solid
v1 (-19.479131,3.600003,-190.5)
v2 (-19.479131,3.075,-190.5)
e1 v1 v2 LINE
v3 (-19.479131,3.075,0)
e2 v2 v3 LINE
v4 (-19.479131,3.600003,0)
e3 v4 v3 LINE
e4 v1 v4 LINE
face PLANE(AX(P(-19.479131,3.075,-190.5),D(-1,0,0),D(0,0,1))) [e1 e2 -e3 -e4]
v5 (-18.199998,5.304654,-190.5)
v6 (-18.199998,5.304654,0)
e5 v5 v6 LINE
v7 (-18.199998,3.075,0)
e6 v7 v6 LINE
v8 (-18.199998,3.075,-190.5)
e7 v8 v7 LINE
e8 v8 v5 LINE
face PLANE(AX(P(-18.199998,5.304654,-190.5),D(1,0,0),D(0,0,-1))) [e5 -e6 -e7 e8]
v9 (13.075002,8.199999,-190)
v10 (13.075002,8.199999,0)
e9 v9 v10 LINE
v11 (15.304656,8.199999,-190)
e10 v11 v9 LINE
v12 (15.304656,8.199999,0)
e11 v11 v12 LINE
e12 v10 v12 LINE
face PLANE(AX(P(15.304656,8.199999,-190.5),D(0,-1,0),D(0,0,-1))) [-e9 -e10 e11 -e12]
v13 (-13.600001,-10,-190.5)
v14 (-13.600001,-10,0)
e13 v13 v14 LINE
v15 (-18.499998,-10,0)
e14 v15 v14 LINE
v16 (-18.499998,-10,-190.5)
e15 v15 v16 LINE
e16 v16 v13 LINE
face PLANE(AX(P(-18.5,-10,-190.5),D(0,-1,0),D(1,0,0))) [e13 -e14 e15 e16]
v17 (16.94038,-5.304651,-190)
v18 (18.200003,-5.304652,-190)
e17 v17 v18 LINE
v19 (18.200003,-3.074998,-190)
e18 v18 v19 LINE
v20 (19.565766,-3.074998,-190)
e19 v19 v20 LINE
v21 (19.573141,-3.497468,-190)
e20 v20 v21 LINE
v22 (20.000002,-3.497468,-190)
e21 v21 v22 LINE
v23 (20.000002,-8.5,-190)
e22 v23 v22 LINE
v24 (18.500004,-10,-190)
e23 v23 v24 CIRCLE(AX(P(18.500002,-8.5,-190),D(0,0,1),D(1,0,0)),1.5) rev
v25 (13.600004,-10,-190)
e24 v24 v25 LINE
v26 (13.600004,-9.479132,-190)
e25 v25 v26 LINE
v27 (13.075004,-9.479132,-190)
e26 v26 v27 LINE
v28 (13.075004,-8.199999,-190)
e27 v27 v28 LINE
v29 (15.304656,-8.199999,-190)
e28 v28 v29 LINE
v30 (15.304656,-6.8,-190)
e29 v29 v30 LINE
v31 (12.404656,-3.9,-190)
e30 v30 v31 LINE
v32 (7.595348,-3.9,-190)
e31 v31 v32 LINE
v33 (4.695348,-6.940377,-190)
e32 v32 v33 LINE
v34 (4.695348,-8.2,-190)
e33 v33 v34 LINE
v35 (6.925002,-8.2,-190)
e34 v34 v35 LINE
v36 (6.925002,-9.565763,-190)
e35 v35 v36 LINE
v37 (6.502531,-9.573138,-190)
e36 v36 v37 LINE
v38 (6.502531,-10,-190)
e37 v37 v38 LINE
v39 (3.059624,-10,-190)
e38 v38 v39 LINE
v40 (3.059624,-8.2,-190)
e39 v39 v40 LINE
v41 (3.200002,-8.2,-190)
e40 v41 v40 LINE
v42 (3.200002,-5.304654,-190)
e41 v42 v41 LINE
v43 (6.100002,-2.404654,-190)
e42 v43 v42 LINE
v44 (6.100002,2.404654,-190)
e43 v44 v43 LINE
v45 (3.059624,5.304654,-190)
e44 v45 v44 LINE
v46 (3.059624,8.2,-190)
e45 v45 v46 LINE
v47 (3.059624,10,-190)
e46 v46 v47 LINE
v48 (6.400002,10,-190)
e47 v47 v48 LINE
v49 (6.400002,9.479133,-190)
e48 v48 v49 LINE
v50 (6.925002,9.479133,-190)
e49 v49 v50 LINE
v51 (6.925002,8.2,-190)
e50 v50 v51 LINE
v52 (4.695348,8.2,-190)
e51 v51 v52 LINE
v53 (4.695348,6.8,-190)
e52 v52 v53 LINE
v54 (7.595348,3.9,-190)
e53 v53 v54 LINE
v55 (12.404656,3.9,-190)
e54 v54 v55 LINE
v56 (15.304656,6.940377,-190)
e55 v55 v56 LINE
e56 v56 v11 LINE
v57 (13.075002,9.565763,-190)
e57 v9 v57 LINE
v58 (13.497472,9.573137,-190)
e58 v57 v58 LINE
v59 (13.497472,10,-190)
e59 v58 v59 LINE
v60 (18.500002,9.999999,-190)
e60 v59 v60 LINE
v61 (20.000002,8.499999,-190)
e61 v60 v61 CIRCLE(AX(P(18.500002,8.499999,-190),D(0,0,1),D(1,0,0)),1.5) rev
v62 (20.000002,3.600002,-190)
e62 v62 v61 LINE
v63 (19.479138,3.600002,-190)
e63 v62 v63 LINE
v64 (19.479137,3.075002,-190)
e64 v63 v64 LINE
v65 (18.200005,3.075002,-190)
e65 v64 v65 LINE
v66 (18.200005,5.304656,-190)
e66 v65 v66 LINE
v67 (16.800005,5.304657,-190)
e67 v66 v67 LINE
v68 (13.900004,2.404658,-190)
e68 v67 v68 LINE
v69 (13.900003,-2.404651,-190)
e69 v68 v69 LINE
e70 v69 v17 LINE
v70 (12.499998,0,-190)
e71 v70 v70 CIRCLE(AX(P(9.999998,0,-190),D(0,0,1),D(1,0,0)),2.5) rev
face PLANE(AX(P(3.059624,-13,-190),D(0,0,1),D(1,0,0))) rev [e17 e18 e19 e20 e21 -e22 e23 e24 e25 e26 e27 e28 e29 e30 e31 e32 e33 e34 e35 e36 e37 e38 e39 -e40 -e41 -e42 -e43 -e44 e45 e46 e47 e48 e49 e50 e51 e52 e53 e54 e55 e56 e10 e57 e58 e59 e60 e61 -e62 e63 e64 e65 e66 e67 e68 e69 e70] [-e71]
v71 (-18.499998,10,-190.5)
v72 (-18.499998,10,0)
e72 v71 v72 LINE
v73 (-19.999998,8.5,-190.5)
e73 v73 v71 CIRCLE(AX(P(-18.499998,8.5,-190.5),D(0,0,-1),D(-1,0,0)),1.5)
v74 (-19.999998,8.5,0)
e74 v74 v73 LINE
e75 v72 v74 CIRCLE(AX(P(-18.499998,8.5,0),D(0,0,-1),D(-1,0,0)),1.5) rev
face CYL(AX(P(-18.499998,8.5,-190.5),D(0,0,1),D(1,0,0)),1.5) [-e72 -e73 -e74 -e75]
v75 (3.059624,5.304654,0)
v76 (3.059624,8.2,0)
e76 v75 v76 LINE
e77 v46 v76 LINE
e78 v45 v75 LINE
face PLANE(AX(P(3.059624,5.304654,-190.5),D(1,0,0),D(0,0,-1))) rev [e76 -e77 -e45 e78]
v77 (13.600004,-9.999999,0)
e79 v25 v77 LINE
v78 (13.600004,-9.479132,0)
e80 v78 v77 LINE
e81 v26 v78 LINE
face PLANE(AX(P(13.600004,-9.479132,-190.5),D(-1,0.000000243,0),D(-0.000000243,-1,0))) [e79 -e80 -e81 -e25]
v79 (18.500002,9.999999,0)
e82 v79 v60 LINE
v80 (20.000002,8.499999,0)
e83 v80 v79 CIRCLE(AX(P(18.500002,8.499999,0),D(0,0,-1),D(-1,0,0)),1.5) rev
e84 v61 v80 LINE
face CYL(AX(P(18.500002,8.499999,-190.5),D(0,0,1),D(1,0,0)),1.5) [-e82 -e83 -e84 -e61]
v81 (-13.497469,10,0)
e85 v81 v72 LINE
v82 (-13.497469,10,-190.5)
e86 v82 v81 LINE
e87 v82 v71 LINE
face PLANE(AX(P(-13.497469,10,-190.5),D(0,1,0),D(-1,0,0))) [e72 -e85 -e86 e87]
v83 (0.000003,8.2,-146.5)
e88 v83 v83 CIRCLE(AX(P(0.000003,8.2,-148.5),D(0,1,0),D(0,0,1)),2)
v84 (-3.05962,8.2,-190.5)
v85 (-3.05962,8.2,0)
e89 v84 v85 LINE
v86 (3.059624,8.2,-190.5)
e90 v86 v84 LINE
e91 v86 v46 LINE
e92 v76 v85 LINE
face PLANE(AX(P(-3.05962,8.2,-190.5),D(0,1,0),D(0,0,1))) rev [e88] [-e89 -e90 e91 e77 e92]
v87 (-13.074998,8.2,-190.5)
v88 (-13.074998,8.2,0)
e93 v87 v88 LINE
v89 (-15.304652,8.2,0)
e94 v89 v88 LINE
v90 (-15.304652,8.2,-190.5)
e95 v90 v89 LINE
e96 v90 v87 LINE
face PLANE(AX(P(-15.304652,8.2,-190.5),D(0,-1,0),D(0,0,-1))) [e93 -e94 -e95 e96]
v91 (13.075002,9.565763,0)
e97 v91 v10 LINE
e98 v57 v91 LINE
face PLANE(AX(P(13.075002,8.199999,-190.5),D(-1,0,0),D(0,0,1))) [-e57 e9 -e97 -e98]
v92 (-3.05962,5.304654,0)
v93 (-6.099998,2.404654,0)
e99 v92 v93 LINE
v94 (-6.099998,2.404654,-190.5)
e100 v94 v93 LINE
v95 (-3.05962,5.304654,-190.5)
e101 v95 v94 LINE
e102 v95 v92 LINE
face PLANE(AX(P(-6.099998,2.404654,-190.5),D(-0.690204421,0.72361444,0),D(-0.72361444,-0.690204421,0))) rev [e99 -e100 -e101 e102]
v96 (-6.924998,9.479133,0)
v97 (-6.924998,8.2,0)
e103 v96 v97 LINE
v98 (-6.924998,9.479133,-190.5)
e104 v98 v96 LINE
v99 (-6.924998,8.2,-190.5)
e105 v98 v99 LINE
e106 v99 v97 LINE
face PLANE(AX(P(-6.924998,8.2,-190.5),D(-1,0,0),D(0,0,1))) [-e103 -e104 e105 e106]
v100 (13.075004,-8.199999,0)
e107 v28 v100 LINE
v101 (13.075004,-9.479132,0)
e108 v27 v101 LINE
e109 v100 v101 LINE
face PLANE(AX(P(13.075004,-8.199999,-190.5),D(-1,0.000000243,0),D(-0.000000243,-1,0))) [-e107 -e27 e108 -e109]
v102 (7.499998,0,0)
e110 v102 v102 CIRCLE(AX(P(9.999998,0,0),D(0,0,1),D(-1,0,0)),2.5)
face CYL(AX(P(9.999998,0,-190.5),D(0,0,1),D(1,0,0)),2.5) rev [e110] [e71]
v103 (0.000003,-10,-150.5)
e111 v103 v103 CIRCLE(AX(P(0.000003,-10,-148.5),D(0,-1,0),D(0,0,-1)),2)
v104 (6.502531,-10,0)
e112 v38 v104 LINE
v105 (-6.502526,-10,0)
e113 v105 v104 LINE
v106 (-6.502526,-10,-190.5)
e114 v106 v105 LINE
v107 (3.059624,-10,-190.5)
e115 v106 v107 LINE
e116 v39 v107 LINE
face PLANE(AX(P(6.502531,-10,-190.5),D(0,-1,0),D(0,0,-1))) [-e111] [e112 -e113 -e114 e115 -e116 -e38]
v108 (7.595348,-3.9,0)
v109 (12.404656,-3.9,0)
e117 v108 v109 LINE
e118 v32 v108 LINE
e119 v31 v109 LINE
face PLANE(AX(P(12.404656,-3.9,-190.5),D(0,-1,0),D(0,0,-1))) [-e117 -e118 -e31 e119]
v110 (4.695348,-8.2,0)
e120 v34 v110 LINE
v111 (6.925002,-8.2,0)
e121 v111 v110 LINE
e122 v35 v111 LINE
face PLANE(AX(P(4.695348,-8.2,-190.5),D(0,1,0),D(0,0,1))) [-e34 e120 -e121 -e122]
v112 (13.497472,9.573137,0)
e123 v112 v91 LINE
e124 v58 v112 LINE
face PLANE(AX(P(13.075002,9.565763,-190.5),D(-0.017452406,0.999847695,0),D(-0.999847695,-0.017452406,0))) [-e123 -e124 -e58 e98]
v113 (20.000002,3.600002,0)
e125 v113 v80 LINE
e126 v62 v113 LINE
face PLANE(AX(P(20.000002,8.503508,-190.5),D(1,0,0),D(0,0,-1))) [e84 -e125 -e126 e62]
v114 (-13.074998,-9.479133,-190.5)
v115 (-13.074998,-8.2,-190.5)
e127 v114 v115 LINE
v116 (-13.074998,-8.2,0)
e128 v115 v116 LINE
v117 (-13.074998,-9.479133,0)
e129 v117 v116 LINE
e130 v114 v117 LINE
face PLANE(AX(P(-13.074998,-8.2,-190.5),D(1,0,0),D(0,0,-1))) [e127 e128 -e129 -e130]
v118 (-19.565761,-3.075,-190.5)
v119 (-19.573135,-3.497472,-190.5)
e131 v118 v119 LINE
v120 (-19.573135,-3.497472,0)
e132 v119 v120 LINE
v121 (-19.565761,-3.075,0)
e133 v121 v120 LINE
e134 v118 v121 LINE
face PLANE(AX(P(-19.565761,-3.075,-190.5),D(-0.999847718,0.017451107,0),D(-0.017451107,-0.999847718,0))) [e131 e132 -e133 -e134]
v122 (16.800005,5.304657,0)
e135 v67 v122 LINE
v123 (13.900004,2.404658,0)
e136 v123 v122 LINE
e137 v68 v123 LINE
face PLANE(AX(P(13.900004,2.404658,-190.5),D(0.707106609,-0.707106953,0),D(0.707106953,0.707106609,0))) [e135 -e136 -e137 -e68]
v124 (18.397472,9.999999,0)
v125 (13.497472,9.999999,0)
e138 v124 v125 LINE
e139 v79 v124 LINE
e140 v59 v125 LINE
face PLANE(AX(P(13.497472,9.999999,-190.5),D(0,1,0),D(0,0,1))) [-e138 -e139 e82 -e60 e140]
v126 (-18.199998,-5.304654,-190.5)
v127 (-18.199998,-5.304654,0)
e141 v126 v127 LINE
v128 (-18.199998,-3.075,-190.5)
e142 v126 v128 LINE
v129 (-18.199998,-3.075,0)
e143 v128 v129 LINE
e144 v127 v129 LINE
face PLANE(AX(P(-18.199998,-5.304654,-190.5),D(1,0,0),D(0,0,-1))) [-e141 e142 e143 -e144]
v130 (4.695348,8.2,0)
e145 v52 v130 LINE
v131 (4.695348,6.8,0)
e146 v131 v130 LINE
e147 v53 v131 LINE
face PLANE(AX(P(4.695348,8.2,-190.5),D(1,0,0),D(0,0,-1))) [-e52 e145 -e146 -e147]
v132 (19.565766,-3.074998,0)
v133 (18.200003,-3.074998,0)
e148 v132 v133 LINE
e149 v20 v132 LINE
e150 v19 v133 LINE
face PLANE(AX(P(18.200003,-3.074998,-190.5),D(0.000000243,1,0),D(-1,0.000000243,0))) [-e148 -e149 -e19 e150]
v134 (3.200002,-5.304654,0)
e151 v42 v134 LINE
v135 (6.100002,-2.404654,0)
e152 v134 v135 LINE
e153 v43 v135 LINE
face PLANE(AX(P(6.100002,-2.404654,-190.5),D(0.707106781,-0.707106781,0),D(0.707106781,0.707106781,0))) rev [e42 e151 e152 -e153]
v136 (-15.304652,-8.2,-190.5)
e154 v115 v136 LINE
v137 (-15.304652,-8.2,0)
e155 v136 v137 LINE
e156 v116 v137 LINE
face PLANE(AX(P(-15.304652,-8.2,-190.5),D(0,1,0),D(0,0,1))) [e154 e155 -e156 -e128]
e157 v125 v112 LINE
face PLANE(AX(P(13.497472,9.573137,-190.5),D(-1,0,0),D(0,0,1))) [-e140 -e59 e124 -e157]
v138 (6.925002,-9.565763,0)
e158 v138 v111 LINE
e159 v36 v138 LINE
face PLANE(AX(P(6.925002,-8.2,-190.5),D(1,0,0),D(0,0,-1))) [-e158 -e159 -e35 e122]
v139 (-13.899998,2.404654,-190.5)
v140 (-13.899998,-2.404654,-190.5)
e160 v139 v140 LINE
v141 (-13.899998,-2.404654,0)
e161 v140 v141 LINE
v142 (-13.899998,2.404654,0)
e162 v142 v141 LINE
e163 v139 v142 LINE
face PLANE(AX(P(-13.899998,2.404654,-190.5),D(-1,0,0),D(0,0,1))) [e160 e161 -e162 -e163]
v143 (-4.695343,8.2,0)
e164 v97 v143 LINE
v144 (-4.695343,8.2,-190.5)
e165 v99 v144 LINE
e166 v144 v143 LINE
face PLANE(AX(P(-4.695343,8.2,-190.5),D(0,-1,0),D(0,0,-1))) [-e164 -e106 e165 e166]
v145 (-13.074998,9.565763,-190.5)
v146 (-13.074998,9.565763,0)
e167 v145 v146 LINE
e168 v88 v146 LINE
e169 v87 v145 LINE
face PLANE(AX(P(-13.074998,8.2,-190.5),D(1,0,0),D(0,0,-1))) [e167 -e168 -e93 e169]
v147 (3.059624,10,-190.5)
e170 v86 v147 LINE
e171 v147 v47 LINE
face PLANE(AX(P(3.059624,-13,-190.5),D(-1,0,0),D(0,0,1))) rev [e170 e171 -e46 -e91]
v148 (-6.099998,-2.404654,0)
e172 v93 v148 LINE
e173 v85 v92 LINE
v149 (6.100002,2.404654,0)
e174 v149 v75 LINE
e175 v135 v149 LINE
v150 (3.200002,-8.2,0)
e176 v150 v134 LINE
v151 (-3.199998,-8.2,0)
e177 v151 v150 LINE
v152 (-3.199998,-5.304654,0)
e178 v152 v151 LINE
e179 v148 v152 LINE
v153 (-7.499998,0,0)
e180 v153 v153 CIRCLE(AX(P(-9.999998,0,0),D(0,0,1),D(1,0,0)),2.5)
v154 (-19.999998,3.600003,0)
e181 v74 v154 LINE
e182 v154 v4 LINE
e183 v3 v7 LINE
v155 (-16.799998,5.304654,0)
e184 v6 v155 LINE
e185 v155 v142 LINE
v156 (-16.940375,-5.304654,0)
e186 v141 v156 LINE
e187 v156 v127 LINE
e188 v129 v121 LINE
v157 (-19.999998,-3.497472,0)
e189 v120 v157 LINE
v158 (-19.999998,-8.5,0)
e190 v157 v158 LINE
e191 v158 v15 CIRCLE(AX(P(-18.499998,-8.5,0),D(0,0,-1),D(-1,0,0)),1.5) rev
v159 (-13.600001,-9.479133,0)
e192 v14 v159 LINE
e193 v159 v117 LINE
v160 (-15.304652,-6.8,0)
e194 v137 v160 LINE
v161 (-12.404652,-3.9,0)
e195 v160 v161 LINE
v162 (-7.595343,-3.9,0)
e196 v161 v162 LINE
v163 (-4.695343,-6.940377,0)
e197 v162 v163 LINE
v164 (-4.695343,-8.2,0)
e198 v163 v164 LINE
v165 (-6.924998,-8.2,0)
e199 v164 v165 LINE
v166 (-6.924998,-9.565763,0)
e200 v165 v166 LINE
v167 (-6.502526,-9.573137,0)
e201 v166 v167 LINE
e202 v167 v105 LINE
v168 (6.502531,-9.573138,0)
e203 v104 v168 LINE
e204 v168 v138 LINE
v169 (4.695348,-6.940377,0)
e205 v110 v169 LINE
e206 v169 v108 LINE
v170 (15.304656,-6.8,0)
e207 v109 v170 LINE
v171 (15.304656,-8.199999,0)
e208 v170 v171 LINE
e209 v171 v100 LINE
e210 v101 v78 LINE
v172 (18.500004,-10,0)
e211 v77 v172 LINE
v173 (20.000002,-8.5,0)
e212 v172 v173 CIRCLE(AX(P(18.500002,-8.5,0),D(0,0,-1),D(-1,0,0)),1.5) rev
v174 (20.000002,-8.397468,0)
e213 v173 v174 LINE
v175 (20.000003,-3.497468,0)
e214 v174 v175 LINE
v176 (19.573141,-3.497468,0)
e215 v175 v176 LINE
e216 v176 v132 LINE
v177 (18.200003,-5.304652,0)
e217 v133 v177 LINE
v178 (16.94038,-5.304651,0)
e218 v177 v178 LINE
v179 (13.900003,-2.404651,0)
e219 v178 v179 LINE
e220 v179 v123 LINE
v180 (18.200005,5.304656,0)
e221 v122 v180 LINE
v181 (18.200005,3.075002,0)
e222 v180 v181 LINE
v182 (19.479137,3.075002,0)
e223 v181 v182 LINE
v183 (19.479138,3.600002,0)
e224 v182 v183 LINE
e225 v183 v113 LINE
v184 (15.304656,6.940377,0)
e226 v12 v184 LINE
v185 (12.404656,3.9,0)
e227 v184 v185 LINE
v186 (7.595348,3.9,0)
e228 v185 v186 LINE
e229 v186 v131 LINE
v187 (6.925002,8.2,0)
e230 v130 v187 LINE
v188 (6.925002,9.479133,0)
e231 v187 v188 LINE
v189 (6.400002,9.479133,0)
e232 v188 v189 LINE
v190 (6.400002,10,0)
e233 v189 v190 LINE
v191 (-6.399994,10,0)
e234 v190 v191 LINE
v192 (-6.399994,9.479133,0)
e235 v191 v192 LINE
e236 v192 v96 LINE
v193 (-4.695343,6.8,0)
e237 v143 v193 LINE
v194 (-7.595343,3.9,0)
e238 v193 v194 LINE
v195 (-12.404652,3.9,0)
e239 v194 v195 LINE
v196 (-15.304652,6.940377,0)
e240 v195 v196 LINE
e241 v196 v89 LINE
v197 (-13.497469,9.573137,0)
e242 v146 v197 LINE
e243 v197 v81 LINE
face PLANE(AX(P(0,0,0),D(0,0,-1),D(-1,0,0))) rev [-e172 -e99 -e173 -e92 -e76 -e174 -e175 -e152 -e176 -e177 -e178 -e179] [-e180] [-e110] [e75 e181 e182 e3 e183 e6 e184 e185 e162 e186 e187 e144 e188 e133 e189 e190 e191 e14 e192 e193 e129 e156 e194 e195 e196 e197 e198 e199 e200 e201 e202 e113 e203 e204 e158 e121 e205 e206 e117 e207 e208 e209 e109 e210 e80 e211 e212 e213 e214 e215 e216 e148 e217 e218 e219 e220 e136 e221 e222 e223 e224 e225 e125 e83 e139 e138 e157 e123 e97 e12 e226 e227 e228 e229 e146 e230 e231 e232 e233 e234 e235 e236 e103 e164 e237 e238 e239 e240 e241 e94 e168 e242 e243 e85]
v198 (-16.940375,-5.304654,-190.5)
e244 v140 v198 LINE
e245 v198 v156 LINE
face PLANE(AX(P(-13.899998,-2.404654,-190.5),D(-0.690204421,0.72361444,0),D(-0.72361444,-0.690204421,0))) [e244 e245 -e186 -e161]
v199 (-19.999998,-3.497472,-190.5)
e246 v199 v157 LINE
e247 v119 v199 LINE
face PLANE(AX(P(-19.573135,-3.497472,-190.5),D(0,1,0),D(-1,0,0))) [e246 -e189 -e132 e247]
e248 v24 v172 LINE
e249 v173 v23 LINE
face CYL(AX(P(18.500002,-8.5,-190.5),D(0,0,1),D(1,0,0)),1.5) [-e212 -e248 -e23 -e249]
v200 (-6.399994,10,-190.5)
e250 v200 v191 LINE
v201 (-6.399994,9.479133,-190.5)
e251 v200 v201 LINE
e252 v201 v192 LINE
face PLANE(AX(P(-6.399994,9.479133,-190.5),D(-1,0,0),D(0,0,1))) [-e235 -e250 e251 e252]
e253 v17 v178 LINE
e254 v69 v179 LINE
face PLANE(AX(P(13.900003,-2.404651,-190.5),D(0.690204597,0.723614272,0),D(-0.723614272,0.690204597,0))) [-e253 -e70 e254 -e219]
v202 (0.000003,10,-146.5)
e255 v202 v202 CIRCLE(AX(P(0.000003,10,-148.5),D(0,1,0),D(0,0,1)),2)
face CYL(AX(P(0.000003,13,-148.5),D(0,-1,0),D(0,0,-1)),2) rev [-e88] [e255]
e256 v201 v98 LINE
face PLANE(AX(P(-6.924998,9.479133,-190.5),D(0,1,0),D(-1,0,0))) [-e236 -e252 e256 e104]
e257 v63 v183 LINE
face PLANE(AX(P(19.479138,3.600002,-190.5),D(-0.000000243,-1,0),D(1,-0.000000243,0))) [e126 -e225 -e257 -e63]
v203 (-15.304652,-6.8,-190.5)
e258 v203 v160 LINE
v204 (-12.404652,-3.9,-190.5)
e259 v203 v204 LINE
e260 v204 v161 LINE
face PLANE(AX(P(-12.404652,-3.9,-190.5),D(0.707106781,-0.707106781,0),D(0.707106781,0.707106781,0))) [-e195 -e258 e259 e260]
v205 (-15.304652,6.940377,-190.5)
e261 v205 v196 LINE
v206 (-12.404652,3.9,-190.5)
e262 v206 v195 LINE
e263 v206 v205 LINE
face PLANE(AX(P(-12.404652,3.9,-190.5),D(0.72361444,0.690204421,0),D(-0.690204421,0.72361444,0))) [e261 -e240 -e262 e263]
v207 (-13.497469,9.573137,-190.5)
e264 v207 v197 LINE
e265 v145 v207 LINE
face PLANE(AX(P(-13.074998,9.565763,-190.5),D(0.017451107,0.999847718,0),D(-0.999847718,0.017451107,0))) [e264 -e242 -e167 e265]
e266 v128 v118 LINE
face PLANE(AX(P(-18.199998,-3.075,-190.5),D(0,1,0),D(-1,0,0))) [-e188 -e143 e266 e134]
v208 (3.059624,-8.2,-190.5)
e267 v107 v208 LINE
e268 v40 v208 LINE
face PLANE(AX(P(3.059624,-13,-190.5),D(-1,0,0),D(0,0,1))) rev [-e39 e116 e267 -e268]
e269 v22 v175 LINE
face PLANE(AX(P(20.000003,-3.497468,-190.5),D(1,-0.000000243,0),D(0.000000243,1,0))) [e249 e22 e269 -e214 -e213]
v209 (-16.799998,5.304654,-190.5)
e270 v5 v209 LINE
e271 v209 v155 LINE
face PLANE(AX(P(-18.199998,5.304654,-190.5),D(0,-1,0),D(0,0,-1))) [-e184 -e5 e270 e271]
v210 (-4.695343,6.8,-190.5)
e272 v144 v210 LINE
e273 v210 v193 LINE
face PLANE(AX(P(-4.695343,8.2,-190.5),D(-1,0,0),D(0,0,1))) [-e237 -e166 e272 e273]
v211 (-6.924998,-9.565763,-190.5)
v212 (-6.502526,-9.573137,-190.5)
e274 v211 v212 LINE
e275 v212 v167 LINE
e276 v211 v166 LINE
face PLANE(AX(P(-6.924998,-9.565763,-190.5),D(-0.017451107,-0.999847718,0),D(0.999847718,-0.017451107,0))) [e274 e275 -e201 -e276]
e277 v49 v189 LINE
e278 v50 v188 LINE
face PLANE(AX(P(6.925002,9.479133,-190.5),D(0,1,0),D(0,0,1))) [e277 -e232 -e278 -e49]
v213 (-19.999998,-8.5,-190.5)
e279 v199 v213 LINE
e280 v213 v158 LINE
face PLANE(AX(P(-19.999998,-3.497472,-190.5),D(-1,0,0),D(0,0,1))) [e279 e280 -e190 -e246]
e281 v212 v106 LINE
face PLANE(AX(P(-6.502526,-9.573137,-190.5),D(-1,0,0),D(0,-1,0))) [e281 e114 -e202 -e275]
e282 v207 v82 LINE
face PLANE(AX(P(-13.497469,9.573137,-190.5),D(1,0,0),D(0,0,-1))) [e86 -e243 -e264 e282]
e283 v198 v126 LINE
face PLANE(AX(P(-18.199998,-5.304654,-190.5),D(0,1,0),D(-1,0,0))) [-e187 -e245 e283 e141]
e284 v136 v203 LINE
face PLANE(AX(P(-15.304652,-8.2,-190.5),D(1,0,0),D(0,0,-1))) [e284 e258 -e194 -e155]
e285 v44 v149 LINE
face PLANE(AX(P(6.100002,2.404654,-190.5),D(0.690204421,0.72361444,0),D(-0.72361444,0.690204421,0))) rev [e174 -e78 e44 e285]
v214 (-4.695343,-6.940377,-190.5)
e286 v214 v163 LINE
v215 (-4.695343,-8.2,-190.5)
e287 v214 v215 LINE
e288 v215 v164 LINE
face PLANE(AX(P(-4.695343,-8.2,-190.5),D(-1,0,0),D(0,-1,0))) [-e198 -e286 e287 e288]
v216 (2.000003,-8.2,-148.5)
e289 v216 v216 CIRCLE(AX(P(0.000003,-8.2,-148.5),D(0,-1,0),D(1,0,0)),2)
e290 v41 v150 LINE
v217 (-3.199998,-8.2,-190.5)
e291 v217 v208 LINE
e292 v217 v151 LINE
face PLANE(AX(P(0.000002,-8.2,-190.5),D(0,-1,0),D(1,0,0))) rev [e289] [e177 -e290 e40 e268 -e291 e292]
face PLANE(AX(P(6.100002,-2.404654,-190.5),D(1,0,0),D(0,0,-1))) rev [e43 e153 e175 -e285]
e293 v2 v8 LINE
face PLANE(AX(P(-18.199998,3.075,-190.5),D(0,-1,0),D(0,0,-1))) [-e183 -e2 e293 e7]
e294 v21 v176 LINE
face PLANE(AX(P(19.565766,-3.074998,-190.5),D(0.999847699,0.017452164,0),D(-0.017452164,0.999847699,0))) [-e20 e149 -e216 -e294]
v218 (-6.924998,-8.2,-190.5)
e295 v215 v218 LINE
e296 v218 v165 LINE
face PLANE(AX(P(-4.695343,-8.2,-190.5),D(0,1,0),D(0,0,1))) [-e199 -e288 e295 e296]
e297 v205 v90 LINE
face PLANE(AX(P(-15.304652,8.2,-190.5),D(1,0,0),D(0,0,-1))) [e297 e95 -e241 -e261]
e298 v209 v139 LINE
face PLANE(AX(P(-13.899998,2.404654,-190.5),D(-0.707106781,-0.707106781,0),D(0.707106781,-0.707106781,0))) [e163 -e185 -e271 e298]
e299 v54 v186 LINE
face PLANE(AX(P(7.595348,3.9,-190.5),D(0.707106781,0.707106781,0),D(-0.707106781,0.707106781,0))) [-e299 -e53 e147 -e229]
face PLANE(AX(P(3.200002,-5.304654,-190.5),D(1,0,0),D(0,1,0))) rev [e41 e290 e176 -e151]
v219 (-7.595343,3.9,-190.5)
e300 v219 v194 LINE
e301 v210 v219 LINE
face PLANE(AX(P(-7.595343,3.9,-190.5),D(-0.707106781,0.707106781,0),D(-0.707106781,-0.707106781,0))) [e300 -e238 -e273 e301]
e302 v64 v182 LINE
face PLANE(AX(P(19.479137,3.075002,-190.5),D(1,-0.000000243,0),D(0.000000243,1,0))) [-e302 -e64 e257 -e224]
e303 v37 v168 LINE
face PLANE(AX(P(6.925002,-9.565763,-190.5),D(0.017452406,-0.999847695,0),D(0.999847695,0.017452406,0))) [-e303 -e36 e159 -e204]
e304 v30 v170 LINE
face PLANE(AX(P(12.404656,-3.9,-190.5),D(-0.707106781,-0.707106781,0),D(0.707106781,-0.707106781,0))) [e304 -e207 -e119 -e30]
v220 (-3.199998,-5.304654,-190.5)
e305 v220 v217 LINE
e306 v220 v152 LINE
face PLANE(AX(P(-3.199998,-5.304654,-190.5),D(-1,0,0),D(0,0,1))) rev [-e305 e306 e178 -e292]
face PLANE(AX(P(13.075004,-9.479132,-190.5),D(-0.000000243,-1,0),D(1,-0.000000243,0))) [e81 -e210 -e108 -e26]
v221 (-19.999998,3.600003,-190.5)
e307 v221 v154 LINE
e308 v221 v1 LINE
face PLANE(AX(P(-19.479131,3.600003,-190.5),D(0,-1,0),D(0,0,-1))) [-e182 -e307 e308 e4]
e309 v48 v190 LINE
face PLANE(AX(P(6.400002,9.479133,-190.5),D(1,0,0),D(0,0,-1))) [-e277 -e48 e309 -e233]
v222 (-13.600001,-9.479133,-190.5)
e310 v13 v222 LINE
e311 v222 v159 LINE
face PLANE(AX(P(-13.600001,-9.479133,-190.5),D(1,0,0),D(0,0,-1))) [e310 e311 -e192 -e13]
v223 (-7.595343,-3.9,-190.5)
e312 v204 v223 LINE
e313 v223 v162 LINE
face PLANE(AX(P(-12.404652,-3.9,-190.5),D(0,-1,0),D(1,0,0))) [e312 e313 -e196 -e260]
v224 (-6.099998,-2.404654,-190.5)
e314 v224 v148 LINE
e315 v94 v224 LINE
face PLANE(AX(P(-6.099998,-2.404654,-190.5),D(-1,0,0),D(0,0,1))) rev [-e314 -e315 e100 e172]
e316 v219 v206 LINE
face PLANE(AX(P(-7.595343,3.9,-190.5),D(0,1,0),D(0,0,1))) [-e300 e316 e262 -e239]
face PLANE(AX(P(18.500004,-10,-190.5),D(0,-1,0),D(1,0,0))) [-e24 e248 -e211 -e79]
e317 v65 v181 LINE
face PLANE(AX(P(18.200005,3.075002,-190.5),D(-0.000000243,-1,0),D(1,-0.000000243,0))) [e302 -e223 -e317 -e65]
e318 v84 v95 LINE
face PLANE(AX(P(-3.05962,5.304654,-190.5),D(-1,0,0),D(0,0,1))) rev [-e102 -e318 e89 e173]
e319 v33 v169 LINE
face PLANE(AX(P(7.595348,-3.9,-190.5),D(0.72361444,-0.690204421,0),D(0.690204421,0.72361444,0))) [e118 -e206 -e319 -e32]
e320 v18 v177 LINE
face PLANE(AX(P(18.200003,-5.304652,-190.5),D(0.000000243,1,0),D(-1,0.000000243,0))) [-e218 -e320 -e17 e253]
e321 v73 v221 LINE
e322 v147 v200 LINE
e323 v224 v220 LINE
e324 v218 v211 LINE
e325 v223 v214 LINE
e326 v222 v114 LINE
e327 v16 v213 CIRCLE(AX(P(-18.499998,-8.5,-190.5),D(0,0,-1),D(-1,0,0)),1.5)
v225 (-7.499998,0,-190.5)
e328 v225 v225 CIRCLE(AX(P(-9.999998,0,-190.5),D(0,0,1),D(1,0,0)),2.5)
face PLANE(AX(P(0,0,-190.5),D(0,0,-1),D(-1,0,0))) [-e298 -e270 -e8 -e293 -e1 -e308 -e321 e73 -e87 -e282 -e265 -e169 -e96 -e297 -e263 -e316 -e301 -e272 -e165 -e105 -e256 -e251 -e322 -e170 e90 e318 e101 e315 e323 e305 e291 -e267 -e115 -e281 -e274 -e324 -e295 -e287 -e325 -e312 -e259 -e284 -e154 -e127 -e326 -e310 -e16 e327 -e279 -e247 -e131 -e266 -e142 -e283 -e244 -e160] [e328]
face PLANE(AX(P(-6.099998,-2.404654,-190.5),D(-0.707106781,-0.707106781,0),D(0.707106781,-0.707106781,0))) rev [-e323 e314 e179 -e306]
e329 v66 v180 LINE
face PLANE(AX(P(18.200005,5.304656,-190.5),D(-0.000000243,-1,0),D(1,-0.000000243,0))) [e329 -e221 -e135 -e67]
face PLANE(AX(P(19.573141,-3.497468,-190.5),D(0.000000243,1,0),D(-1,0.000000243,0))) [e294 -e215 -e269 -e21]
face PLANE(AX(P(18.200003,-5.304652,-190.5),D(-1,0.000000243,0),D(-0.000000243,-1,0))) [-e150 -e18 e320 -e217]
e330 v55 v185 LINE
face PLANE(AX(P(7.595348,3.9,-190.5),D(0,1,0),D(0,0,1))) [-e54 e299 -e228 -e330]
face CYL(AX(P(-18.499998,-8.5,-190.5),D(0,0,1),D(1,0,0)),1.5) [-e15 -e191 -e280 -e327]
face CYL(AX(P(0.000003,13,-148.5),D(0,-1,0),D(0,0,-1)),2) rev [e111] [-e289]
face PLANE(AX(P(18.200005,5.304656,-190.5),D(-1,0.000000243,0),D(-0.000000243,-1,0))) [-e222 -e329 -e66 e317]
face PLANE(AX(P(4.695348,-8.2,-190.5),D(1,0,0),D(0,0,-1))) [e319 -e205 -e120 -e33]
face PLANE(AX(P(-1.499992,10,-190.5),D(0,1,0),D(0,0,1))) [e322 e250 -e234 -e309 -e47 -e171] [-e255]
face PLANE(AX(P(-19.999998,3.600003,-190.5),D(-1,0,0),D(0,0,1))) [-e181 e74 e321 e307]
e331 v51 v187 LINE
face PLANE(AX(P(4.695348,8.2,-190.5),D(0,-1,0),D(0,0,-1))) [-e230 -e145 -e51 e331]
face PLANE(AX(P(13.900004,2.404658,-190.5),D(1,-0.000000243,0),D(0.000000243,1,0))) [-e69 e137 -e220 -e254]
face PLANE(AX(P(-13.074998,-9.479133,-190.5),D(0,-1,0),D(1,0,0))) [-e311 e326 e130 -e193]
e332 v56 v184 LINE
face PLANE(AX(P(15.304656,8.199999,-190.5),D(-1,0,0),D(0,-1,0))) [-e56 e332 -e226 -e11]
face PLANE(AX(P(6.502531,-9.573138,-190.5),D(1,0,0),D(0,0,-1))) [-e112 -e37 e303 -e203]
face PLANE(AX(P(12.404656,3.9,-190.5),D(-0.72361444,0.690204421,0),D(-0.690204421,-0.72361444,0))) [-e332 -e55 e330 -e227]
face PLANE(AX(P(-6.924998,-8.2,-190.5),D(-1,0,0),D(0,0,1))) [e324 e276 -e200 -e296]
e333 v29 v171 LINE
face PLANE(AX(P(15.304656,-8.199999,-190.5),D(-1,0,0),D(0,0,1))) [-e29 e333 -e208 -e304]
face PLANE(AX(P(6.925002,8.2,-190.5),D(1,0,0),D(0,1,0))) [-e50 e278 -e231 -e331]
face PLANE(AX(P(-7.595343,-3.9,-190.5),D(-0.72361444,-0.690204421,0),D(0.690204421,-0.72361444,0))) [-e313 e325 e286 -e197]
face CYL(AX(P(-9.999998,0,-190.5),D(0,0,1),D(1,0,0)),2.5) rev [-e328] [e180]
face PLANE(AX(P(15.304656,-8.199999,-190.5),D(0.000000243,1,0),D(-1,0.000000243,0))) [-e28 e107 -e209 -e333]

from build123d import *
from OCP.BRepAlgoAPI import BRepAlgoAPI_Cut
from OCP.TopTools import TopTools_ListOfShape

# Parameters (mm, degrees)
SKETCH1_R           = 2.5
BOSS_EXTRUDE1_DEPTH = 190.5
FILLET1_R           = 1.5
SKETCH2_W           = 16.94037733
SKETCH2_H           = 0.5
CUT_EXTRUDE1_DEPTH  = 23
SKETCH3_R           = 2
CUT_EXTRUDE2_DEPTH  = 23


with BuildPart() as part:
    # Sketch1 → Boss-Extrude1 (new body)
    with BuildSketch(Plane.XY):
        Polygon((-1.499992211, 10), (2.38e-06, 10), (1.500001785, 10), (6.400001785, 10), (6.400001785, 9.479132912), (6.925001785, 9.479132912), (6.925001785, 8.2), (4.695347664, 8.2), (4.695347664, 6.8), (7.595347664, 3.9), (12.404655907, 3.9), (15.304655907, 6.94037733), (15.304655907, 8.199999348), (13.075001785, 8.199999348), (13.075001785, 9.565762703), (13.497472172, 9.573136951), (13.497472172, 9.999999348), (18.397472172, 9.999999348), (20.000001785, 10), (20.000001785, 8.503508491), (20.000001785, 8.500000005), (20.000001785, 3.600001911), (19.479137611, 3.600002038), (19.479137484, 3.075002038), (18.200004571, 3.075002348), (18.200005113, 5.30465647), (16.800005113, 5.30465681), (13.900004408, 2.404657514), (13.900003241, -2.404650729), (16.940379867, -5.304651467), (18.200002536, -5.304651773), (18.200003078, -3.074997652), (19.565766433, -3.074997983), (19.573140578, -3.497468372), (20.000002975, -3.497468476), (20.000001785, -8.397468476), (20.000001785, -10), (18.500003987, -10), (13.600003987, -9.99999881), (13.600004114, -9.479131722), (13.075004114, -9.479131595), (13.075004424, -8.199998683), (15.304655907, -8.199999224), (15.304655907, -6.8), (12.404655907, -3.9), (7.595347664, -3.9), (4.695347664, -6.94037733), (4.695347664, -8.2), (6.925001785, -8.2), (6.925001785, -9.565763355), (6.502531399, -9.573137603), (6.502531399, -10), (1.602531399, -10), (2.38e-06, -10), (-1.602527233, -10), (-6.502525798, -10), (-6.502525798, -9.573137078), (-6.92499762, -9.565763355), (-6.92499762, -8.2), (-4.695343498, -8.2), (-4.695343498, -6.94037733), (-7.595343498, -3.9), (-12.404651741, -3.9), (-15.304651741, -6.8), (-15.304651741, -8.2), (-13.07499762, -8.2), (-13.07499762, -9.479132912), (-13.600001017, -9.479132912), (-13.600001017, -10), (-18.49999954, -10), (-19.99999762, -10), (-19.99999762, -3.497471822), (-19.573134698, -3.497471822), (-19.565760974, -3.075), (-18.19999762, -3.075), (-18.19999762, -5.304654122), (-16.94037495, -5.304654122), (-13.89999762, -2.404654122), (-13.89999762, 2.404654122), (-16.79999762, 5.304654122), (-18.19999762, 5.304654122), (-18.19999762, 3.075), (-19.479130532, 3.075), (-19.479130532, 3.600003398), (-19.99999762, 3.600003398), (-19.99999762, 10), (-13.497469442, 10), (-13.497469442, 9.573137078), (-13.07499762, 9.565763355), (-13.07499762, 8.2), (-15.304651741, 8.2), (-15.304651741, 6.94037733), (-12.404651741, 3.9), (-7.595343498, 3.9), (-4.695343498, 6.8), (-4.695343498, 8.2), (-6.92499762, 8.2), (-6.92499762, 9.479132912), (-6.399994222, 9.479132912), (-6.399994222, 10), align=None)
        with Locations((-9.99999762, 0)):
            Circle(SKETCH1_R, mode=Mode.SUBTRACT)
        with Locations(Location((9.99999762, 0, 0), (0, 0, 180))):
            Circle(SKETCH1_R, mode=Mode.SUBTRACT)
        Polygon((-3.059620289, 5.304654122), (-3.059620289, 8.2), (2.38e-06, 8.2), (3.059624455, 8.2), (3.059624455, 5.304654122), (6.100001785, 2.404654122), (6.100001785, -2.404654122), (3.200001785, -5.304654122), (3.200001785, -8.2), (2.38e-06, -8.2), (-3.19999762, -8.2), (-3.19999762, -5.304654122), (-6.09999762, -2.404654122), (-6.09999762, 2.404654122), align=None, mode=Mode.SUBTRACT)
    extrude(amount=-BOSS_EXTRUDE1_DEPTH)

    # Fillet1
    fillet1_edges = [part.edges().sort_by_distance(p)[0] for p in [
        (20.000001785, 10, -95.25),
        (20.000001785, -10, -95.25),
        (-19.99999762, -10, -95.25),
        (-19.99999762, 10, -95.25),
    ]]
    fillet(fillet1_edges, radius=FILLET1_R - 0.0001)  # a hair under: the kernel refuses the full size


with BuildPart() as cut_extrude1_tool:
    # Sketch2 → Cut-Extrude1 (new body)
    with BuildSketch(Plane(origin=(0, 10, 0), x_dir=(1, 0, 0), z_dir=(0, 1, 0))):
        with Locations((11.52981312, 190.25)):
            Rectangle(SKETCH2_W, SKETCH2_H)
    extrude(amount=-CUT_EXTRUDE1_DEPTH)


with BuildPart() as part_1:
    add(part.part)

    # Cut-Extrude1: cut by cut_extrude1_tool, with a tolerance
    cut_extrude1_stock = TopTools_ListOfShape()
    cut_extrude1_stock.Append(part_1.part.wrapped)
    cut_extrude1_tools = TopTools_ListOfShape()
    cut_extrude1_tools.Append(cut_extrude1_tool.part.wrapped)
    cut_extrude1_cut = BRepAlgoAPI_Cut()
    cut_extrude1_cut.SetArguments(cut_extrude1_stock)
    cut_extrude1_cut.SetTools(cut_extrude1_tools)
    cut_extrude1_cut.SetFuzzyValue(0.00001)
    cut_extrude1_cut.Build()
    add(Compound.cast(cut_extrude1_cut.Shape()).solids(), mode=Mode.REPLACE)

    # Sketch3 → Cut-Extrude2 (cut)
    with BuildSketch(Plane.XZ.offset(10)):
        with Locations(Location((2.8e-06, -148.5, 0), (0, 0, 270))):
            Circle(SKETCH3_R)
    extrude(amount=-CUT_EXTRUDE2_DEPTH, mode=Mode.SUBTRACT)


solid = part_1.part
